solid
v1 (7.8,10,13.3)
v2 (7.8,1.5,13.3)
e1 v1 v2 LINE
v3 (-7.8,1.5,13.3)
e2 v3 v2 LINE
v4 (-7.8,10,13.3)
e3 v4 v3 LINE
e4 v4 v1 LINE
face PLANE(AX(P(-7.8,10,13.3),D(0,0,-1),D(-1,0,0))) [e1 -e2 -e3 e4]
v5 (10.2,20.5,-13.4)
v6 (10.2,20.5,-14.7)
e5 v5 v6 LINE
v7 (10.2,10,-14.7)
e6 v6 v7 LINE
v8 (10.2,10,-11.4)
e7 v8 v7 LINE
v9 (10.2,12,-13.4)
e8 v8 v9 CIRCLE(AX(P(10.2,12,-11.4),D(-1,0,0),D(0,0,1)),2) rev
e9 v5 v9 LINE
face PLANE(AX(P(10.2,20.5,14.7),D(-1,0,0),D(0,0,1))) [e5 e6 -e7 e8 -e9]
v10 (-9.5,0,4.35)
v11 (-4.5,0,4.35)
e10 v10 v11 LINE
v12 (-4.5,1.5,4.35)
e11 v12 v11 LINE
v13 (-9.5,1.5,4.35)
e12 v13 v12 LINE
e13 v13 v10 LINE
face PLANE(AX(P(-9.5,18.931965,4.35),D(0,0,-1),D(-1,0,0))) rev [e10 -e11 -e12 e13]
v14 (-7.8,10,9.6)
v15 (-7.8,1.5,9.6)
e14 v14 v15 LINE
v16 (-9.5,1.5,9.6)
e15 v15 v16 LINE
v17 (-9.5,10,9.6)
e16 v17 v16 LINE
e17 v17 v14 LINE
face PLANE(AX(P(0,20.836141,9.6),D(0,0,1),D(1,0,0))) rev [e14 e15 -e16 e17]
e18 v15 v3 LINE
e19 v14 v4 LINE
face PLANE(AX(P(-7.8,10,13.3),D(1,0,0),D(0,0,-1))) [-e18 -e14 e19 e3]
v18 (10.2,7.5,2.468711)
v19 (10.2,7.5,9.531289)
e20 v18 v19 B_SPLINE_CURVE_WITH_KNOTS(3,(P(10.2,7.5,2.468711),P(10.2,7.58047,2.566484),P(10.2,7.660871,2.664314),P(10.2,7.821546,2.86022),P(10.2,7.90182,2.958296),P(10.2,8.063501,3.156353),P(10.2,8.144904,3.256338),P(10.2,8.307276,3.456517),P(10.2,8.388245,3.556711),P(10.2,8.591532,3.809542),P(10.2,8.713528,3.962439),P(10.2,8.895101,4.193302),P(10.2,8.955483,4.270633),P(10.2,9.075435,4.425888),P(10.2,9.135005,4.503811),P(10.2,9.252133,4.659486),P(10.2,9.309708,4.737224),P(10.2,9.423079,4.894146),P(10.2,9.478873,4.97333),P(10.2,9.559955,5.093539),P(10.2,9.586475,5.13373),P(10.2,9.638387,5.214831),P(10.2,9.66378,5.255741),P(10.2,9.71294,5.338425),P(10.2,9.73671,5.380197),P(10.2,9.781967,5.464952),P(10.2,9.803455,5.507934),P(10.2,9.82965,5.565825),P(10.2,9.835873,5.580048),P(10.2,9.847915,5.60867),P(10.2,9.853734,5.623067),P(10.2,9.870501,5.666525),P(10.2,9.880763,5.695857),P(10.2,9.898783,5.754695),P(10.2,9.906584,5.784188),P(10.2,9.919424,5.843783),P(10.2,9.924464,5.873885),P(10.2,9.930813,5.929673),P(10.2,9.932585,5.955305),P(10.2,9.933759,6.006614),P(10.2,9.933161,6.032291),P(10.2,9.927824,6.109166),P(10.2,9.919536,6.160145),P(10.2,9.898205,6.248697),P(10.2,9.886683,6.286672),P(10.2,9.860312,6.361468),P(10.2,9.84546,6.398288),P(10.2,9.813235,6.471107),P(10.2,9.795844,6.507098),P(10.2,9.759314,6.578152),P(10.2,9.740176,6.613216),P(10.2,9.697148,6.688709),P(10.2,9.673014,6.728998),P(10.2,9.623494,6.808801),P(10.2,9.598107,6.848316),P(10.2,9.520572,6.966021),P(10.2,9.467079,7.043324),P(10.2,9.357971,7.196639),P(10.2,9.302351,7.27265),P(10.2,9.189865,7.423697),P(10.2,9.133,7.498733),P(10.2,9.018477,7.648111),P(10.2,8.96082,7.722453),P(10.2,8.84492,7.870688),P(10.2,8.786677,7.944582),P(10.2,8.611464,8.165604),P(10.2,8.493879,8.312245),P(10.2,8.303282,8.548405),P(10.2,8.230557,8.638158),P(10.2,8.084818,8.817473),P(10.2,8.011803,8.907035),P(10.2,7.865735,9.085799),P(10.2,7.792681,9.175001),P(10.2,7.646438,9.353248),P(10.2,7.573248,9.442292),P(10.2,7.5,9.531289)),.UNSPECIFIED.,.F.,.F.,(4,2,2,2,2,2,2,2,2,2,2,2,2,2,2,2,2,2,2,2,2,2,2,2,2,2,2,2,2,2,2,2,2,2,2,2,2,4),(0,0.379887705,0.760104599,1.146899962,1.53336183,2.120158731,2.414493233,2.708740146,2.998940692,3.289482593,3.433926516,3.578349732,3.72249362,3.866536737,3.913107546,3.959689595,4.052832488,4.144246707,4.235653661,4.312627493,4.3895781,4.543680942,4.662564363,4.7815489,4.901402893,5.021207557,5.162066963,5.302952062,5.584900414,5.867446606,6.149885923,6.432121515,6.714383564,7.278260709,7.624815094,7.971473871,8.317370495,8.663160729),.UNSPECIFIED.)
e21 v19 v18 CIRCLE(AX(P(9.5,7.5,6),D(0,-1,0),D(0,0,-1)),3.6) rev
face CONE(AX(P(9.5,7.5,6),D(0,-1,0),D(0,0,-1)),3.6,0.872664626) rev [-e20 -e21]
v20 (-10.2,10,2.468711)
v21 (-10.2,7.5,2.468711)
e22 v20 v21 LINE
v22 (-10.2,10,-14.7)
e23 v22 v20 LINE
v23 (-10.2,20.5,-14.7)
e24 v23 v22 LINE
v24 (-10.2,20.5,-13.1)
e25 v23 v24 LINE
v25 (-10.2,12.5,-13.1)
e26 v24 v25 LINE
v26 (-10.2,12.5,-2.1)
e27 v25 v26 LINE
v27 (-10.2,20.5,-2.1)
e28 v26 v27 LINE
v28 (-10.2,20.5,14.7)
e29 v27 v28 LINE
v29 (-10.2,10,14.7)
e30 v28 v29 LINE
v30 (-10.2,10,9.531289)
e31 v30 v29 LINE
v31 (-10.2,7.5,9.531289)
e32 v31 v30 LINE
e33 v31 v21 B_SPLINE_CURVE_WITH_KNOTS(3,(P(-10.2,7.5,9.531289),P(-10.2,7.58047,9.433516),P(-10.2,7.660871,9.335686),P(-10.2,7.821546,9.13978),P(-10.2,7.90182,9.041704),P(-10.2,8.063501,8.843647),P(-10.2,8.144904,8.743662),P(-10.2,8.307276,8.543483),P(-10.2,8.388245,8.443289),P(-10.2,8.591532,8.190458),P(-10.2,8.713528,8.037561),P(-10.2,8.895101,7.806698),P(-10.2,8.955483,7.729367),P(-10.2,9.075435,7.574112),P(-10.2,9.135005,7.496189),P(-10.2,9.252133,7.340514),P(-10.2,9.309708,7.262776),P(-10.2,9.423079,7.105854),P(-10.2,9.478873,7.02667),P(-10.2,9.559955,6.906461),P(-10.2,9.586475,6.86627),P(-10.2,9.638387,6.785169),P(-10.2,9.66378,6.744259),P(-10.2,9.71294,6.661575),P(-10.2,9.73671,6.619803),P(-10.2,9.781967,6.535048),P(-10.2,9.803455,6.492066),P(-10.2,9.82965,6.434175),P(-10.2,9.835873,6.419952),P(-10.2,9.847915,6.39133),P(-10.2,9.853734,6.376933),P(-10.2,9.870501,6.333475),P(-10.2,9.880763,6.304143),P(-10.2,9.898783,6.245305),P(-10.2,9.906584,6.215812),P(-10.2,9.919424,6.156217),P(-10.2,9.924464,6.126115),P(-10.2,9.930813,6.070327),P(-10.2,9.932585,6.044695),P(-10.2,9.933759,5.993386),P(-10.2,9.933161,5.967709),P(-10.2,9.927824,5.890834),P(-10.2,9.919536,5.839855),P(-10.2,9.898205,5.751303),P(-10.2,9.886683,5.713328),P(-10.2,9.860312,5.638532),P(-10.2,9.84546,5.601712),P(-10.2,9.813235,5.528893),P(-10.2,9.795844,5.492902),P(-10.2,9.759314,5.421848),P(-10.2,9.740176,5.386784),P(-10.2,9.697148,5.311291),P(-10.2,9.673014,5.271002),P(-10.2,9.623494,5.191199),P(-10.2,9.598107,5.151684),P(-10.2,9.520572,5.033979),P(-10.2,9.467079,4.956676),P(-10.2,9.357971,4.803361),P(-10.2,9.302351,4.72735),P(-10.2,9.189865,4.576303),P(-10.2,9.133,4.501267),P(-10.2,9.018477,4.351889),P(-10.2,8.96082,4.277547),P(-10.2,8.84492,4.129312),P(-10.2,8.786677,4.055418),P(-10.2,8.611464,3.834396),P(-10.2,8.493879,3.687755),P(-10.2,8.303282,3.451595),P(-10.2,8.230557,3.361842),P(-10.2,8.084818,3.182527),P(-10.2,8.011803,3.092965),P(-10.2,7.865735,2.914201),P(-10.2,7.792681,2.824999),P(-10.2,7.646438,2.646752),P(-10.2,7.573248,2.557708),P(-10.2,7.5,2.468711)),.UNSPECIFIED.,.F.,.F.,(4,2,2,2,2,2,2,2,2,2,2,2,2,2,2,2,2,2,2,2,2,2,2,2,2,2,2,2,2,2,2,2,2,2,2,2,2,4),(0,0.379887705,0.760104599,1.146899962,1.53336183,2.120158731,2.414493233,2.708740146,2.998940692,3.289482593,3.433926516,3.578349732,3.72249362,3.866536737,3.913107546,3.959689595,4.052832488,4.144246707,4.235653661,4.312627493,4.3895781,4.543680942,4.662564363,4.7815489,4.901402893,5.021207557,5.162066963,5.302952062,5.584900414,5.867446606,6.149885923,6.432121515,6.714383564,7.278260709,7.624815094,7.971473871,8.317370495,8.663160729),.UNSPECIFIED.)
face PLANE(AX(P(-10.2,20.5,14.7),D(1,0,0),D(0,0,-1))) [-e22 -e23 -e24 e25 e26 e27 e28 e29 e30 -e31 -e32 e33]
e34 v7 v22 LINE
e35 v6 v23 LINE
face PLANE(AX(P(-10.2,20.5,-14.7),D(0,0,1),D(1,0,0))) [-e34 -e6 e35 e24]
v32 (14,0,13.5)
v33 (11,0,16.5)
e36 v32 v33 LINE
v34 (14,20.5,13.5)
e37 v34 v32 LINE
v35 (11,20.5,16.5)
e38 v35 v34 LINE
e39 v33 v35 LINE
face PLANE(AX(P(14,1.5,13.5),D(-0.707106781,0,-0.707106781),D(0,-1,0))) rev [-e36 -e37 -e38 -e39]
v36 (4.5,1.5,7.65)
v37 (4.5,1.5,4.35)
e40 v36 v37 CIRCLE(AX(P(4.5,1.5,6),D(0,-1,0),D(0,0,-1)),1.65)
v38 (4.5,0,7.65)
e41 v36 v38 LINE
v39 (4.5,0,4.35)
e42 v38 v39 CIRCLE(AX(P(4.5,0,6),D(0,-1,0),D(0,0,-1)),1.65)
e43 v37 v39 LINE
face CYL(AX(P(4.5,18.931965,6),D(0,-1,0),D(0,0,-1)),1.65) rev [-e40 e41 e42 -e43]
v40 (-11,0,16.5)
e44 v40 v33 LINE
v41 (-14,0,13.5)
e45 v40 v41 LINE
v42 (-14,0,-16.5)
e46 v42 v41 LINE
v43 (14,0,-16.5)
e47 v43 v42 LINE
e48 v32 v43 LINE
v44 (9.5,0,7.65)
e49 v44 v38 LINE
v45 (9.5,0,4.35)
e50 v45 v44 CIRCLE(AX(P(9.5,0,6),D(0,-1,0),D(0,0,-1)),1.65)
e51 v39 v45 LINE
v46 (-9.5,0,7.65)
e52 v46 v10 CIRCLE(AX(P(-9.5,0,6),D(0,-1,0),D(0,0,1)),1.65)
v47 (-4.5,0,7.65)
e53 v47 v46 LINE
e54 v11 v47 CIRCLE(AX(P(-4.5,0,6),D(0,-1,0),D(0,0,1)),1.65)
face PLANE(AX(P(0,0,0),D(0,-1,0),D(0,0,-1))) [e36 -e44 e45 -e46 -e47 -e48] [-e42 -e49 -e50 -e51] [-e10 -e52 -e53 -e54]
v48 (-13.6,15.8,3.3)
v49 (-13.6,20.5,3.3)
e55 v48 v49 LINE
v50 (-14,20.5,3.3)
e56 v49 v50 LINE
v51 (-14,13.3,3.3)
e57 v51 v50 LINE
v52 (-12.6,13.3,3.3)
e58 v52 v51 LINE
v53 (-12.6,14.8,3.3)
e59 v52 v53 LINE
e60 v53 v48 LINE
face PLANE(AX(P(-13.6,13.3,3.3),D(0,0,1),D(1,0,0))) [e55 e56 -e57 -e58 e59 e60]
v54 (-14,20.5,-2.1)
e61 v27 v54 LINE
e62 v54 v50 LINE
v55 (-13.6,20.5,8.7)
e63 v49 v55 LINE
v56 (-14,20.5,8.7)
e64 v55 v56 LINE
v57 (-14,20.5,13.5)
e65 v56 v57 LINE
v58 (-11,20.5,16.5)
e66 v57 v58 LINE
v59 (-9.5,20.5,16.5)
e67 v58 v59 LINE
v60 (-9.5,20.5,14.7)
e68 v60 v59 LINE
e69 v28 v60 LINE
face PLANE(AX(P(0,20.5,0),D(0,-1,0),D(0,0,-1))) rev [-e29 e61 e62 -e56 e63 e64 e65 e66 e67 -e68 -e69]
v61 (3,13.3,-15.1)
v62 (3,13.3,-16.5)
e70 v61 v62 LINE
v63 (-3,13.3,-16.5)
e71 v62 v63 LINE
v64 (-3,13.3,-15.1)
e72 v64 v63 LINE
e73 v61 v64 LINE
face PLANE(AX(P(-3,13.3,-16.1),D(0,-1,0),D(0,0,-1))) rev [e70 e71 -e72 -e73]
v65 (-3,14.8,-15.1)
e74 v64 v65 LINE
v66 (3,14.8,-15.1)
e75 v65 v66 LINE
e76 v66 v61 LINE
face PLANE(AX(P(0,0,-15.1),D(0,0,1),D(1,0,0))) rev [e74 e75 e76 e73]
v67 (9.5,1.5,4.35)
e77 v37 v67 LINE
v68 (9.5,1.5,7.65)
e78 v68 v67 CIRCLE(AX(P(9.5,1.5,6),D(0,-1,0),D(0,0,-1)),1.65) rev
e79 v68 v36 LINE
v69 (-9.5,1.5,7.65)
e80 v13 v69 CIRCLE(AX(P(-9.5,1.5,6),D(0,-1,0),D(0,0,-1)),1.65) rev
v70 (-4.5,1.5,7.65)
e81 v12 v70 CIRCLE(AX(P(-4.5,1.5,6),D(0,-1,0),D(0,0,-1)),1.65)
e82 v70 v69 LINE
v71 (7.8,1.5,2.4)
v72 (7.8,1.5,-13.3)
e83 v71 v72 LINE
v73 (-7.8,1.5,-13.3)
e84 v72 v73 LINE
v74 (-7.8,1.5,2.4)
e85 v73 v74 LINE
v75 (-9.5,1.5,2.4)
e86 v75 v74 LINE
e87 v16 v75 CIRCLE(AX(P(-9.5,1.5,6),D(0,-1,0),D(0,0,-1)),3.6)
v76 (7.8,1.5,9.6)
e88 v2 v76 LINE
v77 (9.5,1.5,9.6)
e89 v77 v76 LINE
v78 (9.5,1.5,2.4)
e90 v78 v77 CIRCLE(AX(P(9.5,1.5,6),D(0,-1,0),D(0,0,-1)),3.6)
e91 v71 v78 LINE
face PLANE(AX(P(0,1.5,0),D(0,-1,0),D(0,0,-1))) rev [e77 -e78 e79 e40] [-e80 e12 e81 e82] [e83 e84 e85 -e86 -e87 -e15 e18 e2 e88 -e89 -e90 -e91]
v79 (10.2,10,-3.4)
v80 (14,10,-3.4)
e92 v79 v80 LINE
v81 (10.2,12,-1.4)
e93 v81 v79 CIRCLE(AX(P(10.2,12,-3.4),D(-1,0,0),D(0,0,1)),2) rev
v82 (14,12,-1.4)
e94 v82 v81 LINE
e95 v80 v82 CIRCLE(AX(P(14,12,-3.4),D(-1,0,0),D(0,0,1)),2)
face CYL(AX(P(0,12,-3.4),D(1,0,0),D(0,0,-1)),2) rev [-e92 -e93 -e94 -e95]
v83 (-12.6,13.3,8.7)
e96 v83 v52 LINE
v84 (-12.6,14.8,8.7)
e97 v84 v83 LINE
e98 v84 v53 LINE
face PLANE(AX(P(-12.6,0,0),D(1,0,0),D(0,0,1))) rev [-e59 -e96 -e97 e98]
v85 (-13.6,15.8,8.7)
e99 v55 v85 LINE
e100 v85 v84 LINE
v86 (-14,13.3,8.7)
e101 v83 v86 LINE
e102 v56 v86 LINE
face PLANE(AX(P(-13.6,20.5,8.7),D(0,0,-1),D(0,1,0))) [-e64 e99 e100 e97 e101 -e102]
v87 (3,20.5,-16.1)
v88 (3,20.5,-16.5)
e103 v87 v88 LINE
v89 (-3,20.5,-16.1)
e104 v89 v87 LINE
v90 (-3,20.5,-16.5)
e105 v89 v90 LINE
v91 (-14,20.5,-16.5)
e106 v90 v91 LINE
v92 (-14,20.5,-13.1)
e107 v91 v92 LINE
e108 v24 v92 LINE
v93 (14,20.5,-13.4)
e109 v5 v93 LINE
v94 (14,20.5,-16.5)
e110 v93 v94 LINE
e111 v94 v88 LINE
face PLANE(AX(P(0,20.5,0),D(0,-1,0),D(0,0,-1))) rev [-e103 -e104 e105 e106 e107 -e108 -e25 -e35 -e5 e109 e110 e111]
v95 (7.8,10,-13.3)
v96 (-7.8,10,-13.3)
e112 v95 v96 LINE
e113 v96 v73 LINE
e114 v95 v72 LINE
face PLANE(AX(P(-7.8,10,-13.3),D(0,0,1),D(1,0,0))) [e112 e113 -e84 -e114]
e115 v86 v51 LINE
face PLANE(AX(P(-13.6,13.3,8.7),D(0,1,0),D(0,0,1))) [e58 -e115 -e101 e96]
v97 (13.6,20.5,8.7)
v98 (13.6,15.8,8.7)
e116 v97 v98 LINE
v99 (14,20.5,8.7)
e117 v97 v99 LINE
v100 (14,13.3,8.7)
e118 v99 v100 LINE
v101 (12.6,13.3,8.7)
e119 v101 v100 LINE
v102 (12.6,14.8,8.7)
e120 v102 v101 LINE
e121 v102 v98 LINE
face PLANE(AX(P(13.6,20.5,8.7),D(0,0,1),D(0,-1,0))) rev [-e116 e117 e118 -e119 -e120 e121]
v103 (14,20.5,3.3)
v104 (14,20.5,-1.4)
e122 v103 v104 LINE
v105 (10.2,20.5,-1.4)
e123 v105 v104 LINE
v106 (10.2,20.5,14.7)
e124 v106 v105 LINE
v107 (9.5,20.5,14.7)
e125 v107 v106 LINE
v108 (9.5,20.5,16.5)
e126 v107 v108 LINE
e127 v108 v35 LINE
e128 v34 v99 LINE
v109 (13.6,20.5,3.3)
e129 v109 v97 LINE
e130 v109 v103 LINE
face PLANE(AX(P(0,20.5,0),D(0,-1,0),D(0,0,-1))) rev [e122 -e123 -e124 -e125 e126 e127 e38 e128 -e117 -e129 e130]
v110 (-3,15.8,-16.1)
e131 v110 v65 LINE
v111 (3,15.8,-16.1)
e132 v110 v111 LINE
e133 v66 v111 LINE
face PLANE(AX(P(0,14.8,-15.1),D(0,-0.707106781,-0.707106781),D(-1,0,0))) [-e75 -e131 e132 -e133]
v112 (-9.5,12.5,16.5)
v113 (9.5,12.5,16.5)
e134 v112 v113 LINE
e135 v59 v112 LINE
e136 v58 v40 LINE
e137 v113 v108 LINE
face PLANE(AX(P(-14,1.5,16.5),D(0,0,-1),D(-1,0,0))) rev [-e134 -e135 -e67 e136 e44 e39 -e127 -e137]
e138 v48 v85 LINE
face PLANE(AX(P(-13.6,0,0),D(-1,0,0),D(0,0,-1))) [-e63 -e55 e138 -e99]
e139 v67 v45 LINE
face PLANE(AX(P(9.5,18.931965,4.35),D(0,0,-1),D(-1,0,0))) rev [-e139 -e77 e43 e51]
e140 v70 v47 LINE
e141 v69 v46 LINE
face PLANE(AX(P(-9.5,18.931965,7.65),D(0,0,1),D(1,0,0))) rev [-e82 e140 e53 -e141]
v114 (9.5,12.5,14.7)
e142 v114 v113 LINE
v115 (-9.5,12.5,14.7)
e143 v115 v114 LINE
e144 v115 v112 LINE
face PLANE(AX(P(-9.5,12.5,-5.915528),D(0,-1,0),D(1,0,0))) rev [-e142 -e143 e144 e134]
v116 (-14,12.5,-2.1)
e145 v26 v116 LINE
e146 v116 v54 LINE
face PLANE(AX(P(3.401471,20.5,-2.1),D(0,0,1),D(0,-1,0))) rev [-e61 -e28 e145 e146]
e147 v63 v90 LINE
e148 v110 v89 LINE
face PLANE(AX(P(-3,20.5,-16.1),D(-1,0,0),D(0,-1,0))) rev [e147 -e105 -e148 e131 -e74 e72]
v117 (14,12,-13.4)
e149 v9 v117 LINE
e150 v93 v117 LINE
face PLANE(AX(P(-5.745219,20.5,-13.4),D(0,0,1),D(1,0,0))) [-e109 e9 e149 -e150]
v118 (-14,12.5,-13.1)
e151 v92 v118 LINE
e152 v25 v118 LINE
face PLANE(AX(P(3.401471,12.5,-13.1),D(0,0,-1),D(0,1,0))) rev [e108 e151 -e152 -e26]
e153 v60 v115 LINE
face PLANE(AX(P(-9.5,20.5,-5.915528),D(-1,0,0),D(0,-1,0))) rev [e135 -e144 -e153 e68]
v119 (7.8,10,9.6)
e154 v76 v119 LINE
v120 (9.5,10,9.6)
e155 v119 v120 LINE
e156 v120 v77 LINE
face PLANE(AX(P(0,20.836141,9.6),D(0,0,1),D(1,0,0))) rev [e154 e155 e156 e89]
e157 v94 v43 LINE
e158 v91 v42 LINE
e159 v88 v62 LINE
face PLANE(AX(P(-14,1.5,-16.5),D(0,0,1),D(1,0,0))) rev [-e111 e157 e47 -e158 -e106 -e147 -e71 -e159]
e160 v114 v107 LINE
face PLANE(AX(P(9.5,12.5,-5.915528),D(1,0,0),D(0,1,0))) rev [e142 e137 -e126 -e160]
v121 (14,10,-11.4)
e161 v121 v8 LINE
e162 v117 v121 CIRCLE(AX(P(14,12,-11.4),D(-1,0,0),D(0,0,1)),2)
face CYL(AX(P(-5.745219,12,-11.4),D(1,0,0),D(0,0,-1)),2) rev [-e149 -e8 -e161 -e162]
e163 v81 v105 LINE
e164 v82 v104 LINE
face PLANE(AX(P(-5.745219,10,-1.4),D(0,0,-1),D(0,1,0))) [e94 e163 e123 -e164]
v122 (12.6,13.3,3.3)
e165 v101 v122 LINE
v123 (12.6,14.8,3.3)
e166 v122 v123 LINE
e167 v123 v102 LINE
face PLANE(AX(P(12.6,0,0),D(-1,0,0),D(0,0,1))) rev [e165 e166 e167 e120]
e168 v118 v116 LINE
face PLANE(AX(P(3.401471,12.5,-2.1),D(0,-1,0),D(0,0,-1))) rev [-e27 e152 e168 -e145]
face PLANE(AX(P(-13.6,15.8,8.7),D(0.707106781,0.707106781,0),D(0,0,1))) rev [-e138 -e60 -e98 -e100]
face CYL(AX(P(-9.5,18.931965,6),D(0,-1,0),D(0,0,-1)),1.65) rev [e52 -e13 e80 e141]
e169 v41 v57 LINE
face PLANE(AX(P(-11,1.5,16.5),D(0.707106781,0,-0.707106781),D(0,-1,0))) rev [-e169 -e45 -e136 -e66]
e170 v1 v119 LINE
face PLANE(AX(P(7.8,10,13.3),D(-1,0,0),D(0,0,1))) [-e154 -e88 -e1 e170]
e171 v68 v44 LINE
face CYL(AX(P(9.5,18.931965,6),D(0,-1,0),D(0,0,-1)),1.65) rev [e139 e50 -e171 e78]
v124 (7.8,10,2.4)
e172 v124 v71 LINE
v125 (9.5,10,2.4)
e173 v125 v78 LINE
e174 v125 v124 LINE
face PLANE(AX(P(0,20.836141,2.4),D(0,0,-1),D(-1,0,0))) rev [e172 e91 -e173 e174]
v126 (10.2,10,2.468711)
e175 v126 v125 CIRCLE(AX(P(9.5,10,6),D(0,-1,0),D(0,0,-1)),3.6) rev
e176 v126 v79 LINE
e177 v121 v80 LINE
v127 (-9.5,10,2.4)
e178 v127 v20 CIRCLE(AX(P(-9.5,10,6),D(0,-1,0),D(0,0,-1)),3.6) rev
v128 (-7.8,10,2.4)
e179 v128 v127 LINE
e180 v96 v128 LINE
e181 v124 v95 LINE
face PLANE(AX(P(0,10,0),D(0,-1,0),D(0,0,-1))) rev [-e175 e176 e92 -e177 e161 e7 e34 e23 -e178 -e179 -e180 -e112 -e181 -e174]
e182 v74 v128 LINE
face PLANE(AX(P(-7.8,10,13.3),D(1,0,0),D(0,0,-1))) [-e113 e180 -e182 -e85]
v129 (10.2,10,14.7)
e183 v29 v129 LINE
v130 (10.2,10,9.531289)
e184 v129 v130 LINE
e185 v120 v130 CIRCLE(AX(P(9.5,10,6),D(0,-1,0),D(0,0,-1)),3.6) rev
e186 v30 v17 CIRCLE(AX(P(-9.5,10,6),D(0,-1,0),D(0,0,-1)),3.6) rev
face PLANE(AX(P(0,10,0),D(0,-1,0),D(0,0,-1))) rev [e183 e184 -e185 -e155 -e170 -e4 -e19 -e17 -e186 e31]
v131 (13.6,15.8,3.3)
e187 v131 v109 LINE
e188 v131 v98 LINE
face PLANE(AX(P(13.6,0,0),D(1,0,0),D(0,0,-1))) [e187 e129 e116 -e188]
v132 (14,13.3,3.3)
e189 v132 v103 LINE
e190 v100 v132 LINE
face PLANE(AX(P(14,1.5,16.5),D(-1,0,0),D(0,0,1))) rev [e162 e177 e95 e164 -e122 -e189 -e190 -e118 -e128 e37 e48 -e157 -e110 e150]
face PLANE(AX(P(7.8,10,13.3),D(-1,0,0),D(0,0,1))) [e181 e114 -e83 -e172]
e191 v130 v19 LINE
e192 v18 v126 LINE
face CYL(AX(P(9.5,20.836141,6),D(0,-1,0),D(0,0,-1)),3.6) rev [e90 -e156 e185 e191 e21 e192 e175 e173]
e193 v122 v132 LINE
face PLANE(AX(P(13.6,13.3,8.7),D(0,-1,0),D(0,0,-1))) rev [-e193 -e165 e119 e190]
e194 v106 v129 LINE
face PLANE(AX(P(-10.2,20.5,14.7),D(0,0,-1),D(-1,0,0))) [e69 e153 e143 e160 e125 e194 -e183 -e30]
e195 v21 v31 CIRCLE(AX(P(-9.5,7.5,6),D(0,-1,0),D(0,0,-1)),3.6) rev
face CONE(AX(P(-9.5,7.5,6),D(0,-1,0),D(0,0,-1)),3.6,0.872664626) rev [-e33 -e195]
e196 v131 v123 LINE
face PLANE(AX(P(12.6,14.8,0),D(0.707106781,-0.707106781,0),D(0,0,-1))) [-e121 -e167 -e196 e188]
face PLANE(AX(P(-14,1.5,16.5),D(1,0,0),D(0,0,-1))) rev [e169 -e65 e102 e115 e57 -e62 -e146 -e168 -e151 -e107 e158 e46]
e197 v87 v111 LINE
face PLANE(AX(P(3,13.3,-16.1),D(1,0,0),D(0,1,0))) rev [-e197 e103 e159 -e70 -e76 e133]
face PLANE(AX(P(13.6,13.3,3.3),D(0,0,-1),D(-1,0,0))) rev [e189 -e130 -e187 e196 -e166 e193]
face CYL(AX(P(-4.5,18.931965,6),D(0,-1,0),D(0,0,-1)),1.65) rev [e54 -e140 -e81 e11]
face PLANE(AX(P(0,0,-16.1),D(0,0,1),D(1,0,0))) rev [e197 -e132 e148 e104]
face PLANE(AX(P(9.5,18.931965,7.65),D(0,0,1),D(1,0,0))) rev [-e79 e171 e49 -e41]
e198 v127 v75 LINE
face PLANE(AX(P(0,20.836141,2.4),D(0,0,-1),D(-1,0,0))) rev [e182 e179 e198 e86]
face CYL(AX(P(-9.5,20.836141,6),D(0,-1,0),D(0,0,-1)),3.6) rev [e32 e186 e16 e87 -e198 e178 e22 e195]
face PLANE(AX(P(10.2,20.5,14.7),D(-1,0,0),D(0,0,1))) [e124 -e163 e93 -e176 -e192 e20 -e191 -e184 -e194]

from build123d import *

# Parameters (mm, degrees)
SZKIC1_W                    = 28
SZKIC1_H                    = 33
DODANIE_WYCI_GNI_CIE1_DEPTH = 1.5
SZKIC2_W                    = 28
SZKIC2_H                    = 33
SZKIC2_W_2                  = 20.4
SZKIC2_H_2                  = 29.4
DODANIE_WYCI_GNI_CIE2_DEPTH = 19
SZKIC7_W                    = 20.4
SZKIC7_H                    = 29.4
SZKIC7_W_2                  = 15.6
SZKIC7_H_2                  = 26.6
DODANIE_WYCI_GNI_CIE4_DEPTH = 8.5
SZKIC3_W                    = 12
SZKIC3_H                    = 10.5
WYTNIJ_WYCI_GNI_CIE1_DEPTH  = 3.8
SZKIC4_W                    = 19
SZKIC4_H                    = 8
WYTNIJ_WYCI_GNI_CIE2_DEPTH  = 1.8
SZKIC5_W                    = 11
SZKIC5_H                    = 8
WYTNIJ_WYCI_GNI_CIE3_DEPTH  = 3.8
WYTNIJ_WYCI_GNI_CIE4_START  = -10
WYTNIJ_WYCI_GNI_CIE4_DEPTH  = 10
WYTNIJ_WYCI_GNI_CIE8_START  = -1.5
WYTNIJ_WYCI_GNI_CIE8_DEPTH  = 8.5
ZAOKR_GLENIE1_R             = 2
SZKIC10_W                   = 5.4
SZKIC10_H                   = 7.2
WYTNIJ_WYCI_GNI_CIE9_DEPTH  = 0.4
SZKIC11_W                   = 5.4
SZKIC11_H                   = 2.5
WYTNIJ_WYCI_GNI_CIE10_DEPTH = 1
SZKIC12_W                   = 6
SZKIC12_H                   = 7.2
WYTNIJ_WYCI_GNI_CIE11_DEPTH = 0.4
SZKIC13_W                   = 6
SZKIC13_H                   = 2.5
WYTNIJ_WYCI_GNI_CIE12_DEPTH = 1
SFAZOWANIE1_SIZE            = 1
SFAZOWANIE2_SIZE            = 3
SFAZOWANIE3_SIZE            = 2.5
SFAZOWANIE3_SIZE_2          = 2.979383981


# Some blends are built 0.0001 mm under size
with BuildPart() as part:
    # Szkic1 → Dodanie-wyciągnięcie1 (new body)
    with BuildSketch(Plane(origin=(0, 0, 0), x_dir=(1, 0, 0), z_dir=(0, 1, 0))):
        Rectangle(SZKIC1_W, SZKIC1_H)
    extrude(amount=DODANIE_WYCI_GNI_CIE1_DEPTH)

    # Szkic2 → Dodanie-wyciągnięcie2 (add)
    with BuildSketch(Plane(origin=(0, 1.5, 0), x_dir=(1, 0, 0), z_dir=(0, 1, 0))):
        Rectangle(SZKIC2_W, SZKIC2_H)
        Rectangle(SZKIC2_W_2, SZKIC2_H_2, mode=Mode.SUBTRACT)
    extrude(amount=DODANIE_WYCI_GNI_CIE2_DEPTH)

    # Szkic7 → Dodanie-wyciągnięcie4 (add)
    with BuildSketch(Plane(origin=(0, 1.5, 0), x_dir=(1, 0, 0), z_dir=(0, 1, 0))):
        Rectangle(SZKIC7_W, SZKIC7_H)
        Rectangle(SZKIC7_W_2, SZKIC7_H_2, mode=Mode.SUBTRACT)
    extrude(amount=DODANIE_WYCI_GNI_CIE4_DEPTH)

    # Szkic3 → Wytnij-wyciągnięcie1 (cut)
    with BuildSketch(Plane(origin=(14, 0, 0), x_dir=(0, 0, -1), z_dir=(1, 0, 0))):
        with Locations((7.4, 15.25)):
            Rectangle(SZKIC3_W, SZKIC3_H)
    extrude(amount=-WYTNIJ_WYCI_GNI_CIE1_DEPTH, mode=Mode.SUBTRACT)

    # Szkic4 → Wytnij-wyciągnięcie2 (cut)
    with BuildSketch(Plane.XY.offset(16.5)):
        with Locations((0, 16.5)):
            Rectangle(SZKIC4_W, SZKIC4_H)
    extrude(amount=-WYTNIJ_WYCI_GNI_CIE2_DEPTH, mode=Mode.SUBTRACT)

    # Szkic5 → Wytnij-wyciągnięcie3 (cut)
    with BuildSketch(Plane.ZY.offset(14)):
        with Locations((-7.6, 16.5)):
            Rectangle(SZKIC5_W, SZKIC5_H)
    extrude(amount=-WYTNIJ_WYCI_GNI_CIE3_DEPTH, mode=Mode.SUBTRACT)

    # Szkic8 → Wytnij-wyciągnięcie4 (cut)
    with BuildSketch(Plane.XZ.offset(WYTNIJ_WYCI_GNI_CIE4_START)):
        with BuildLine():
            Line((9.5, 4.35), (4.5, 4.35))
            ThreePointArc((4.5, 4.35), (2.85, 6), (4.5, 7.65))
            Line((4.5, 7.65), (9.5, 7.65))
            ThreePointArc((9.5, 7.65), (11.15, 6), (9.5, 4.35))
        make_face()
        with BuildLine():
            Line((-9.5, 4.35), (-4.5, 4.35))
            ThreePointArc((-4.5, 4.35), (-2.85, 6), (-4.5, 7.65))
            Line((-4.5, 7.65), (-9.5, 7.65))
            ThreePointArc((-9.5, 7.65), (-11.15, 6), (-9.5, 4.35))
        make_face()
    extrude(amount=WYTNIJ_WYCI_GNI_CIE4_DEPTH, mode=Mode.SUBTRACT)

    # Szkic9 → Wytnij-wyciągnięcie8 (cut)
    with BuildSketch(Plane.XZ.offset(WYTNIJ_WYCI_GNI_CIE8_START)):
        with BuildLine():
            Line((-9.5, 2.4), (-5.001731613, 2.4))
            Line((-5.001731613, 2.4), (-5.001731613, 9.6))
            Line((-5.001731613, 9.6), (-9.5, 9.6))
            ThreePointArc((-9.5, 9.6), (-13.1, 6), (-9.5, 2.4))
        make_face()
        with BuildLine():
            Line((5.001731613, 9.6), (9.5, 9.6))
            ThreePointArc((9.5, 9.6), (13.1, 6), (9.5, 2.4))
            Line((9.5, 2.4), (5.001731613, 2.4))
            Line((5.001731613, 2.4), (5.001731613, 9.6))
        make_face()
    extrude(amount=-WYTNIJ_WYCI_GNI_CIE8_DEPTH, mode=Mode.SUBTRACT)

    # Zaokrąglenie1
    zaokr_glenie1_edges = [part.edges().sort_by_distance(p)[0] for p in [
        (12.1, 10, -13.4),
        (12.1, 10, -1.4),
    ]]
    fillet(zaokr_glenie1_edges, radius=ZAOKR_GLENIE1_R)

    # Szkic10 → Wytnij-wyciągnięcie9 (cut)
    with BuildSketch(Plane(origin=(14, 0, 0), x_dir=(0, 0, -1), z_dir=(1, 0, 0))):
        with Locations((-6, 16.9)):
            Rectangle(SZKIC10_W, SZKIC10_H)
    wytnij_wyci_gni_cie9 = extrude(amount=-WYTNIJ_WYCI_GNI_CIE9_DEPTH, mode=Mode.SUBTRACT)

    # Szkic11 → Wytnij-wyciągnięcie10 (cut)
    with BuildSketch(Plane(origin=(13.6, 0, 0), x_dir=(0, 0, -1), z_dir=(1, 0, 0))):
        with Locations((-6, 14.55)):
            Rectangle(SZKIC11_W, SZKIC11_H)
    wytnij_wyci_gni_cie10 = extrude(amount=-WYTNIJ_WYCI_GNI_CIE10_DEPTH, mode=Mode.SUBTRACT)

    # Szkic12 → Wytnij-wyciągnięcie11 (cut)
    with BuildSketch(Plane(origin=(0, 0, -16.5), x_dir=(-1, 0, 0), z_dir=(0, 0, -1))):
        with Locations((0, 16.9)):
            Rectangle(SZKIC12_W, SZKIC12_H)
    extrude(amount=-WYTNIJ_WYCI_GNI_CIE11_DEPTH, mode=Mode.SUBTRACT)

    # Szkic13 → Wytnij-wyciągnięcie12 (cut)
    with BuildSketch(Plane(origin=(0, 0, -16.1), x_dir=(-1, 0, 0), z_dir=(0, 0, -1))):
        with Locations((0, 14.55)):
            Rectangle(SZKIC13_W, SZKIC13_H)
    extrude(amount=-WYTNIJ_WYCI_GNI_CIE12_DEPTH, mode=Mode.SUBTRACT)

    # Lustro1: Wytnij-wyciągnięcie9, Wytnij-wyciągnięcie10 across plane
    add(wytnij_wyci_gni_cie9.mirror(Plane(origin=(0, 0, 0), x_dir=(0, 0, 1), z_dir=(1, 0, 0))), mode=Mode.SUBTRACT)
    add(wytnij_wyci_gni_cie10.mirror(Plane(origin=(0, 0, 0), x_dir=(0, 0, 1), z_dir=(1, 0, 0))), mode=Mode.SUBTRACT)

    # Sfazowanie1
    sfazowanie1_edges = [part.edges().sort_by_distance(p)[0] for p in [
        (12.6, 15.8, 6),
        (0, 15.8, -15.1),
        (-12.6, 15.8, 6),
    ]]
    chamfer(sfazowanie1_edges, length=SFAZOWANIE1_SIZE - 0.0001)  # a hair under: the kernel refuses the full size

    # Sfazowanie2
    sfazowanie2_edges = [part.edges().sort_by_distance(p)[0] for p in [
        (14, 10.25, 16.5),
        (-14, 10.25, 16.5),
    ]]
    chamfer(sfazowanie2_edges, length=SFAZOWANIE2_SIZE)

    # Sfazowanie3
    # the kernel refuses this chamfer: 2.979383981, 2.5 mm, written as the material it adds along each edge
    with BuildSketch(Plane(origin=(9.5, 10, 6), x_dir=(-0.9999950652018581, 0, 0.0031415874858795353), z_dir=(-0.0031415874858795353, 0, -0.9999950652018581))) as sfazowanie3_piece_1_section:
        Polygon((3.6, -SFAZOWANIE3_SIZE), (3.6 - SFAZOWANIE3_SIZE_2, 0), (3.6, 0), align=None)
    sfazowanie3_piece_1 = revolve(axis=Axis((9.5, 10, 6), (0, 1, 0)), revolution_arc=359.64, mode=Mode.PRIVATE)
    sfazowanie3_piece_1 = split(sfazowanie3_piece_1, bisect_by=Plane(origin=(10.2, 9.026977163, 6), z_dir=(1, 0, 0)), keep=Keep.TOP, mode=Mode.PRIVATE)
    add(sfazowanie3_piece_1)
    with BuildSketch(Plane(origin=(-9.5, 10, 6), x_dir=(0.9999950652018581, 0, 0.003141587485879782), z_dir=(0.003141587485879782, 0, -0.9999950652018581))) as sfazowanie3_piece_2_section:
        Polygon((3.6 - SFAZOWANIE3_SIZE_2, 0), (3.6, SFAZOWANIE3_SIZE), (3.6, 0), align=None)
    sfazowanie3_piece_2 = revolve(axis=Axis((-9.5, 10, 6), (0, -1, 0)), revolution_arc=359.64, mode=Mode.PRIVATE)
    sfazowanie3_piece_2 = split(sfazowanie3_piece_2, bisect_by=Plane(origin=(-10.2, 9.026977163, 6.000000001), z_dir=(-1, 0, 0)), keep=Keep.TOP, mode=Mode.PRIVATE)
    add(sfazowanie3_piece_2)


solid = part.part
